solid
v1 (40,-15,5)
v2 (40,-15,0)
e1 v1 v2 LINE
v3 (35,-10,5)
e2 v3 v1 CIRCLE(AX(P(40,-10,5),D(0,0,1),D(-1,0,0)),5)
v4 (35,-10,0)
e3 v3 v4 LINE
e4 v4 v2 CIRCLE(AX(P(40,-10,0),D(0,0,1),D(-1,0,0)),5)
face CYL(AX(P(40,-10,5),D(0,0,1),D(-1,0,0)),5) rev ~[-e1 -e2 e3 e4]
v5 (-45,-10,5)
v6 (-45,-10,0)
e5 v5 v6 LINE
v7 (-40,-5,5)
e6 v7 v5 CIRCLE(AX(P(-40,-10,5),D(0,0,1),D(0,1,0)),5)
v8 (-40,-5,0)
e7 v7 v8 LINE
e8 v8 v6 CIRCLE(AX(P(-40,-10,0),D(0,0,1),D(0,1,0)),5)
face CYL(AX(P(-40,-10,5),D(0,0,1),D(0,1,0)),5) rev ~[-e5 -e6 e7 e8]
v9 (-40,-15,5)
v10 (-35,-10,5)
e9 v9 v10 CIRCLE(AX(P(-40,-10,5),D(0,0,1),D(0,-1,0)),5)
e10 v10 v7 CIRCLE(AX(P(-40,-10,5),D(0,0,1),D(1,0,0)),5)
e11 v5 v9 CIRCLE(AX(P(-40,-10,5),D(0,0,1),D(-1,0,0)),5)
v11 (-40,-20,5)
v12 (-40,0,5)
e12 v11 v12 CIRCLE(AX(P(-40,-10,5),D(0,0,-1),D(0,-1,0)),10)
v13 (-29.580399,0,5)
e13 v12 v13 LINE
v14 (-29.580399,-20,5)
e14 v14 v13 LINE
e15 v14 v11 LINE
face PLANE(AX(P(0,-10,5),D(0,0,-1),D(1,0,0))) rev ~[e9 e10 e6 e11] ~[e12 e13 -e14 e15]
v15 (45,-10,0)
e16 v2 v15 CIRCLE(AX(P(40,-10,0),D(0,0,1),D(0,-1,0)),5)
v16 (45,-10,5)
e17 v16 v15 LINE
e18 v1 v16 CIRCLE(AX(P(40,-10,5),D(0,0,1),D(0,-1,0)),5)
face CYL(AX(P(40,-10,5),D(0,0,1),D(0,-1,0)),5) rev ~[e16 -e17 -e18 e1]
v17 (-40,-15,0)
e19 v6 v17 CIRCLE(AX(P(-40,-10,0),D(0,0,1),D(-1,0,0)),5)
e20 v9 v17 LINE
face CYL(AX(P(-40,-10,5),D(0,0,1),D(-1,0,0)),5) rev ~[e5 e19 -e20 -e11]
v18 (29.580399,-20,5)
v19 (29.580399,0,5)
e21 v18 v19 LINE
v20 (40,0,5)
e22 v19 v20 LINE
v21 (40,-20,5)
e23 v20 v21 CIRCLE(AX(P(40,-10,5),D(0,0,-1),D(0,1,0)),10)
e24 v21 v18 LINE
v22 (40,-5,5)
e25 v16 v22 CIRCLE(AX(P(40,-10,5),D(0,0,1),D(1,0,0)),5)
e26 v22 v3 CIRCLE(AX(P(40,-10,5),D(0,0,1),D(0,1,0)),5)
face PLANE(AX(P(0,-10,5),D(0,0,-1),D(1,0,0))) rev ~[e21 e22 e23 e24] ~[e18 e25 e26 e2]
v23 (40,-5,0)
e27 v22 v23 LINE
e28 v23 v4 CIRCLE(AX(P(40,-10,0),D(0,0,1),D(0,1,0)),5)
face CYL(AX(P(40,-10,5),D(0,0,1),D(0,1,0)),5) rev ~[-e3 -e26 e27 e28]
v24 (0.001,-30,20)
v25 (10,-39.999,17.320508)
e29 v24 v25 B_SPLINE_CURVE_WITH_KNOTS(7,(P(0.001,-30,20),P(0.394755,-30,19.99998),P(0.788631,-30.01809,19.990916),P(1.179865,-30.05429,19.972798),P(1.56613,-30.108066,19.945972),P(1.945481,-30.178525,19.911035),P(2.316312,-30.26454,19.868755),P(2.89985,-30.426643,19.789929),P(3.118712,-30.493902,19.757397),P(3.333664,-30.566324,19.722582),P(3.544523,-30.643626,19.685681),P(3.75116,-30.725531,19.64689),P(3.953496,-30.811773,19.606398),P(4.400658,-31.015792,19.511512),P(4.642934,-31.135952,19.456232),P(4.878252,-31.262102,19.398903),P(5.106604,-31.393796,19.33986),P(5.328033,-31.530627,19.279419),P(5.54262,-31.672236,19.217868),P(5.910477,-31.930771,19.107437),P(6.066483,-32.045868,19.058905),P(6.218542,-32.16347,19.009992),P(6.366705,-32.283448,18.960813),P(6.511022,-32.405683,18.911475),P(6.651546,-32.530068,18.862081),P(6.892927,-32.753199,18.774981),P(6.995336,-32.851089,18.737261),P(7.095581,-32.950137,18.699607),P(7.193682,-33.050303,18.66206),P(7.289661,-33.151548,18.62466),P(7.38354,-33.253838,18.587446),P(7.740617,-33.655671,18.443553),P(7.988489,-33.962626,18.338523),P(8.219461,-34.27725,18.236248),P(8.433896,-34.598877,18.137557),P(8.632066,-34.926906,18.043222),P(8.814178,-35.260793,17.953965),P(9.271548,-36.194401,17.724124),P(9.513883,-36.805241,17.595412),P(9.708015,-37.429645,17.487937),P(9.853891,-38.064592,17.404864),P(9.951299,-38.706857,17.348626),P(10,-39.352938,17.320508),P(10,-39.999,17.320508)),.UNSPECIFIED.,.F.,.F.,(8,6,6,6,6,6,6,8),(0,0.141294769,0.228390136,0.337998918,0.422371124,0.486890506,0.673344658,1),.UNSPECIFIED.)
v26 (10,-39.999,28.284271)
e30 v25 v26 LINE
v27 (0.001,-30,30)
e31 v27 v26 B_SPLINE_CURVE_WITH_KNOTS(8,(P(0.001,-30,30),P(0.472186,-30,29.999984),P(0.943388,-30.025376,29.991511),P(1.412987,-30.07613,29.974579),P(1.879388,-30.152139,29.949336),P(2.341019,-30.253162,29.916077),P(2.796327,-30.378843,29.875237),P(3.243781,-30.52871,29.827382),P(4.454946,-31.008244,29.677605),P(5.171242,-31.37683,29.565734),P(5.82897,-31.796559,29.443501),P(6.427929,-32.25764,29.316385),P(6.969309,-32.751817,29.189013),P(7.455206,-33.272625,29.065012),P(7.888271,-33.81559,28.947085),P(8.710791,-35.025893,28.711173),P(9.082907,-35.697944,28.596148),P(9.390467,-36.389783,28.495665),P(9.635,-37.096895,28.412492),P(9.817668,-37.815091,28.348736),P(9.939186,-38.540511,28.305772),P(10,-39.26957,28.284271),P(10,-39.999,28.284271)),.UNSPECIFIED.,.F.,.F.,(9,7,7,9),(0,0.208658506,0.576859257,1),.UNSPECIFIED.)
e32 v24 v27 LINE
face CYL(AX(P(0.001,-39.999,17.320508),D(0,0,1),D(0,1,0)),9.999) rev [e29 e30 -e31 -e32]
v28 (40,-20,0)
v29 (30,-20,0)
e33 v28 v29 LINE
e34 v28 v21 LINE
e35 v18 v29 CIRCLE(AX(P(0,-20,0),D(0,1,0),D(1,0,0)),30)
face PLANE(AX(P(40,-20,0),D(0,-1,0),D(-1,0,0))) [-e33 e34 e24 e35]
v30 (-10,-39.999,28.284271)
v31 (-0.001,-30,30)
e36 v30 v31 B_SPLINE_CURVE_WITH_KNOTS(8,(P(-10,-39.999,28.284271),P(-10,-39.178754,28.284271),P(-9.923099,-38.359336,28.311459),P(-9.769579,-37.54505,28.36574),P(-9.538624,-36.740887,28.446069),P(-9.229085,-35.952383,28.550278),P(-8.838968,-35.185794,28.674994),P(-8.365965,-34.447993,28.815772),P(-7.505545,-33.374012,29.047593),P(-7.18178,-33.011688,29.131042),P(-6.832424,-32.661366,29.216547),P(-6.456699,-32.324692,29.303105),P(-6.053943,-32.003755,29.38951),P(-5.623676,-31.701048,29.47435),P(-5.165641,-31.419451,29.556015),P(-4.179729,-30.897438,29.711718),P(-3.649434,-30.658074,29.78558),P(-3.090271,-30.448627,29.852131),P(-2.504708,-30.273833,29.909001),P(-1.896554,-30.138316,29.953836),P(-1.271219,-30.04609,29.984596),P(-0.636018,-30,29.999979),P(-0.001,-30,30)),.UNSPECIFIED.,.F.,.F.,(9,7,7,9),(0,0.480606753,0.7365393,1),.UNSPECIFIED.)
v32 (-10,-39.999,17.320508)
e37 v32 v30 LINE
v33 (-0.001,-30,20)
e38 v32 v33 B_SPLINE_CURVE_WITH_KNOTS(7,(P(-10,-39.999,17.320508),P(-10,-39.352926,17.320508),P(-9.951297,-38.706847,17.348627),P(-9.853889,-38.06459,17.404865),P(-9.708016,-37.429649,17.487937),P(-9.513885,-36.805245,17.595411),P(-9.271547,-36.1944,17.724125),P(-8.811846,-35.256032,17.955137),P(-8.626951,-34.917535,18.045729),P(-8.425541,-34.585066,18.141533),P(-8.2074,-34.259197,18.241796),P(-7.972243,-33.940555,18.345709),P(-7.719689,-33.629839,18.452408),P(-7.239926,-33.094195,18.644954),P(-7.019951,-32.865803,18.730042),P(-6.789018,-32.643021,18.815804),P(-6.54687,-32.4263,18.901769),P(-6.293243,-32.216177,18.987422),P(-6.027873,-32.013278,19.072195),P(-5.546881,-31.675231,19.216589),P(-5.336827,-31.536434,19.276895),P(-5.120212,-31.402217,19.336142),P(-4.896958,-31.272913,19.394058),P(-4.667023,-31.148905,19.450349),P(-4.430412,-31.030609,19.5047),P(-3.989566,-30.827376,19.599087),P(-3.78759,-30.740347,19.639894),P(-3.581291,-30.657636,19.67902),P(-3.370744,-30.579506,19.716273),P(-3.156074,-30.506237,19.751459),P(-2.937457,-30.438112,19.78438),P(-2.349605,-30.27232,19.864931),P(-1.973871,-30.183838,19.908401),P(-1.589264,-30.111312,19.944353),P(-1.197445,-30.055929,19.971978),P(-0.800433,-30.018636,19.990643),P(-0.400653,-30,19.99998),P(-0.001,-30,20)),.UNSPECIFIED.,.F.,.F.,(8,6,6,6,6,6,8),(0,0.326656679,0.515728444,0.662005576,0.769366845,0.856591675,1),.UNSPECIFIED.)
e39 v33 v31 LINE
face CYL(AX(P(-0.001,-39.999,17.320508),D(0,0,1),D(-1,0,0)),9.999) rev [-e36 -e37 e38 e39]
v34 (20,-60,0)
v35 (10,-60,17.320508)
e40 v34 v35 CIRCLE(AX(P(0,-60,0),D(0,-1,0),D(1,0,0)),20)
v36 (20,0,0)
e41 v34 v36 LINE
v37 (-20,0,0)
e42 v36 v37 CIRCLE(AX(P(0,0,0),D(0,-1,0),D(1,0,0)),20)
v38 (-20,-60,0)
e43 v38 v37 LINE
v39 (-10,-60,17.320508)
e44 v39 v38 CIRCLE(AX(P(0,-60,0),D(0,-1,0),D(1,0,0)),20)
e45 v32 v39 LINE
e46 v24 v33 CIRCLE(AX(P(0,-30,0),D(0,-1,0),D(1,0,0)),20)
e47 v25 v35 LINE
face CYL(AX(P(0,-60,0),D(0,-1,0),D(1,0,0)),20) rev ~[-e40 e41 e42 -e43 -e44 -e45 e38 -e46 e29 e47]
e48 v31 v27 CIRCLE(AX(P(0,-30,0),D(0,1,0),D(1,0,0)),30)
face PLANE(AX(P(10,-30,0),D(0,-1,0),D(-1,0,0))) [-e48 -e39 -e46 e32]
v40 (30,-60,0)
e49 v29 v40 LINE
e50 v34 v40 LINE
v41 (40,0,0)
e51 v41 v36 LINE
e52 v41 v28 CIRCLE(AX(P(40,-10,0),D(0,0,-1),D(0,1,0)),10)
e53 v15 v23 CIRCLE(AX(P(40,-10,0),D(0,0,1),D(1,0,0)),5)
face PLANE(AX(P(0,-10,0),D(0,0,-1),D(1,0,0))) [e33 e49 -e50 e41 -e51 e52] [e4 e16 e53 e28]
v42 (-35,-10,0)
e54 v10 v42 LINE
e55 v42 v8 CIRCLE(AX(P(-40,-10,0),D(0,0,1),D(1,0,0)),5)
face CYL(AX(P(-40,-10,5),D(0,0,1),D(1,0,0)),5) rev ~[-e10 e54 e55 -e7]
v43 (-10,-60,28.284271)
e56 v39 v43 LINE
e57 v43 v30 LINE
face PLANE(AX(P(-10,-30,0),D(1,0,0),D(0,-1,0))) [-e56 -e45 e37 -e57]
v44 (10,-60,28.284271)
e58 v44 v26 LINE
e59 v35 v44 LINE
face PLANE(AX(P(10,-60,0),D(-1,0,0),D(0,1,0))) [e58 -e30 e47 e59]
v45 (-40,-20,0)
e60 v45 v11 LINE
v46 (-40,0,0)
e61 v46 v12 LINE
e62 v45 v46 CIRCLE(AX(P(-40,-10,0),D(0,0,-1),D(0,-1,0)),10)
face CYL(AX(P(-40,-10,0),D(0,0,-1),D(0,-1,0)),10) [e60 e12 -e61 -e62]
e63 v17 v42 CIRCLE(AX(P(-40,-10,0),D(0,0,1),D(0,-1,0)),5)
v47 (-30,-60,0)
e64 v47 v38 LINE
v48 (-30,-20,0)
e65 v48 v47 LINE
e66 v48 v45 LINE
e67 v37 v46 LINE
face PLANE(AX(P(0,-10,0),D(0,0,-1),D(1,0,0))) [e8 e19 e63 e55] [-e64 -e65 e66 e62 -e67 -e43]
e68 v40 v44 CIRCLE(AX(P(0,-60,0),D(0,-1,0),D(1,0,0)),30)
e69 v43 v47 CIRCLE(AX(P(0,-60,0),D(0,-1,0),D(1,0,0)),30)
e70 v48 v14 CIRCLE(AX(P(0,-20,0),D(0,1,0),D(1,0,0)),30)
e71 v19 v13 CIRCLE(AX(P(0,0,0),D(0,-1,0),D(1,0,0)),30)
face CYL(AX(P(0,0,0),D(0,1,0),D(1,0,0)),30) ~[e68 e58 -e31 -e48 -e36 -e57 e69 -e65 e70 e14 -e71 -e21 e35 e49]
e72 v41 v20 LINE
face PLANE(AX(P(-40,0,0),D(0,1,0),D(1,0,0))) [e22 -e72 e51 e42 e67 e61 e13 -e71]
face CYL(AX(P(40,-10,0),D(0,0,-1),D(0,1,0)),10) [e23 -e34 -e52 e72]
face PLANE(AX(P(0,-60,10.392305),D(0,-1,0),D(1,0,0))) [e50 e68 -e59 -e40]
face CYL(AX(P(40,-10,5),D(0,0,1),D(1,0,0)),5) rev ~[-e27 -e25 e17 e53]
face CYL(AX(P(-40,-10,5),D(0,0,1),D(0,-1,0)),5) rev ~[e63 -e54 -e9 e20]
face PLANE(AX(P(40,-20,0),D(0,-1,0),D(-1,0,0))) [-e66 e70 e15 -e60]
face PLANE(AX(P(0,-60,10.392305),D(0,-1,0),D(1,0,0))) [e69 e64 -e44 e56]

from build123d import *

# Parameters (mm, degrees)
F1_DEPTH  = 60
F3_DEPTH  = 5
F5_DEPTH  = 5.001
F7_DEPTH  = 5.001
F9_DEPTH  = 60.001
F11_REACH = 66.0565127546
F12_R     = 9.999


# Not quite as in the source:
# - a fillet or chamfer is up to 0.001 mm smaller than in the source, because OpenCascade refuses the exact size


with BuildPart() as f1:
    # F0 (on Front) → F1 (new body)
    with BuildSketch(Plane.XZ):
        with BuildLine():
            Line((-30, 0), (30, 0))
            ThreePointArc((30, 0), (0, 30), (-30, 0))
        make_face()
    extrude(amount=F1_DEPTH)

    # F2 (on face) → F3 (join)
    with BuildSketch(Plane(origin=(0, 0, 0), x_dir=(1, 0, 0), z_dir=(0, 0, -1))):
        with BuildLine():
            ThreePointArc((-40, 20), (-50, 10), (-40, 0))
            Line((-40, 0), (40, 0))
            ThreePointArc((40, 0), (50, 10), (40, 20))
            Line((40, 20), (-40, 20))
        make_face()
    extrude(amount=-F3_DEPTH)

    # F4 (on face) → F5 (cut, through all)
    with BuildSketch(Plane.XY.offset(5)):
        with BuildLine():
            Line((-45, -10), (-40, -10))
            Line((-40, -10), (-40, -5))
            ThreePointArc((-40, -5), (-43.5355339059, -6.4644660941), (-45, -10))
        make_face()
        with BuildLine():
            Line((-40, -5), (-40, -10))
            Line((-40, -10), (-35, -10))
            ThreePointArc((-35, -10), (-36.4644660941, -6.4644660941), (-40, -5))
        make_face()
        with BuildLine():
            Line((-40, -10), (-40, -15))
            ThreePointArc((-40, -15), (-36.4644660941, -13.5355339059), (-35, -10))
            Line((-35, -10), (-40, -10))
        make_face()
        with BuildLine():
            ThreePointArc((-45, -10), (-43.5355339059, -13.5355339059), (-40, -15))
            Line((-40, -15), (-40, -10))
            Line((-40, -10), (-45, -10))
        make_face()
    extrude(amount=-F5_DEPTH, mode=Mode.SUBTRACT)

    # F6 (on face) → F7 (cut, through all)
    with BuildSketch(Plane.XY.offset(5)):
        with BuildLine():
            ThreePointArc((40, -5), (36.4644660941, -6.4644660941), (35, -10))
            Line((35, -10), (40, -10))
            Line((40, -10), (40, -5))
        make_face()
        with BuildLine():
            Line((40, -5), (40, -10))
            Line((40, -10), (45, -10))
            ThreePointArc((45, -10), (43.5355339059, -6.4644660941), (40, -5))
        make_face()
        with BuildLine():
            Line((45, -10), (40, -10))
            Line((40, -10), (40, -15))
            ThreePointArc((40, -15), (43.5355339059, -13.5355339059), (45, -10))
        make_face()
        with BuildLine():
            Line((40, -10), (35, -10))
            ThreePointArc((35, -10), (36.4644660941, -13.5355339059), (40, -15))
            Line((40, -15), (40, -10))
        make_face()
    extrude(amount=-F7_DEPTH, mode=Mode.SUBTRACT)

    # F8 (on face) → F9 (cut, through all)
    with BuildSketch(Plane.XZ.offset(60)):
        with BuildLine():
            Line((-20, 0), (20, 0))
            ThreePointArc((20, 0), (0, 20), (-20, 0))
        make_face()
    extrude(amount=-F9_DEPTH, mode=Mode.SUBTRACT)

    f11_end = f1.faces().sort_by_distance((0, -30, 30))[0]
    # F10 (on Top) → F11 (cut, up to a face of the model that its end follows)
    with BuildSketch(Plane.XY):
        Polygon((-10, -60), (0, -60), (10, -60), (10, -30), (-10, -30), align=None)
    f11_long = extrude(amount=F11_REACH, mode=Mode.PRIVATE)
    add(split(f11_long, bisect_by=f11_end, keep=Keep.BOTTOM, mode=Mode.PRIVATE), mode=Mode.SUBTRACT)

    # F12 (radius 10 in the source; OpenCascade refuses exactly that, so slightly less here)
    f12_edges = [f1.edges().sort_by_distance(p)[0] for p in [
        (-10, -30, 22.80239),
        (10, -30, 22.80239),
    ]]
    fillet(f12_edges, radius=F12_R)


solid = f1.part
